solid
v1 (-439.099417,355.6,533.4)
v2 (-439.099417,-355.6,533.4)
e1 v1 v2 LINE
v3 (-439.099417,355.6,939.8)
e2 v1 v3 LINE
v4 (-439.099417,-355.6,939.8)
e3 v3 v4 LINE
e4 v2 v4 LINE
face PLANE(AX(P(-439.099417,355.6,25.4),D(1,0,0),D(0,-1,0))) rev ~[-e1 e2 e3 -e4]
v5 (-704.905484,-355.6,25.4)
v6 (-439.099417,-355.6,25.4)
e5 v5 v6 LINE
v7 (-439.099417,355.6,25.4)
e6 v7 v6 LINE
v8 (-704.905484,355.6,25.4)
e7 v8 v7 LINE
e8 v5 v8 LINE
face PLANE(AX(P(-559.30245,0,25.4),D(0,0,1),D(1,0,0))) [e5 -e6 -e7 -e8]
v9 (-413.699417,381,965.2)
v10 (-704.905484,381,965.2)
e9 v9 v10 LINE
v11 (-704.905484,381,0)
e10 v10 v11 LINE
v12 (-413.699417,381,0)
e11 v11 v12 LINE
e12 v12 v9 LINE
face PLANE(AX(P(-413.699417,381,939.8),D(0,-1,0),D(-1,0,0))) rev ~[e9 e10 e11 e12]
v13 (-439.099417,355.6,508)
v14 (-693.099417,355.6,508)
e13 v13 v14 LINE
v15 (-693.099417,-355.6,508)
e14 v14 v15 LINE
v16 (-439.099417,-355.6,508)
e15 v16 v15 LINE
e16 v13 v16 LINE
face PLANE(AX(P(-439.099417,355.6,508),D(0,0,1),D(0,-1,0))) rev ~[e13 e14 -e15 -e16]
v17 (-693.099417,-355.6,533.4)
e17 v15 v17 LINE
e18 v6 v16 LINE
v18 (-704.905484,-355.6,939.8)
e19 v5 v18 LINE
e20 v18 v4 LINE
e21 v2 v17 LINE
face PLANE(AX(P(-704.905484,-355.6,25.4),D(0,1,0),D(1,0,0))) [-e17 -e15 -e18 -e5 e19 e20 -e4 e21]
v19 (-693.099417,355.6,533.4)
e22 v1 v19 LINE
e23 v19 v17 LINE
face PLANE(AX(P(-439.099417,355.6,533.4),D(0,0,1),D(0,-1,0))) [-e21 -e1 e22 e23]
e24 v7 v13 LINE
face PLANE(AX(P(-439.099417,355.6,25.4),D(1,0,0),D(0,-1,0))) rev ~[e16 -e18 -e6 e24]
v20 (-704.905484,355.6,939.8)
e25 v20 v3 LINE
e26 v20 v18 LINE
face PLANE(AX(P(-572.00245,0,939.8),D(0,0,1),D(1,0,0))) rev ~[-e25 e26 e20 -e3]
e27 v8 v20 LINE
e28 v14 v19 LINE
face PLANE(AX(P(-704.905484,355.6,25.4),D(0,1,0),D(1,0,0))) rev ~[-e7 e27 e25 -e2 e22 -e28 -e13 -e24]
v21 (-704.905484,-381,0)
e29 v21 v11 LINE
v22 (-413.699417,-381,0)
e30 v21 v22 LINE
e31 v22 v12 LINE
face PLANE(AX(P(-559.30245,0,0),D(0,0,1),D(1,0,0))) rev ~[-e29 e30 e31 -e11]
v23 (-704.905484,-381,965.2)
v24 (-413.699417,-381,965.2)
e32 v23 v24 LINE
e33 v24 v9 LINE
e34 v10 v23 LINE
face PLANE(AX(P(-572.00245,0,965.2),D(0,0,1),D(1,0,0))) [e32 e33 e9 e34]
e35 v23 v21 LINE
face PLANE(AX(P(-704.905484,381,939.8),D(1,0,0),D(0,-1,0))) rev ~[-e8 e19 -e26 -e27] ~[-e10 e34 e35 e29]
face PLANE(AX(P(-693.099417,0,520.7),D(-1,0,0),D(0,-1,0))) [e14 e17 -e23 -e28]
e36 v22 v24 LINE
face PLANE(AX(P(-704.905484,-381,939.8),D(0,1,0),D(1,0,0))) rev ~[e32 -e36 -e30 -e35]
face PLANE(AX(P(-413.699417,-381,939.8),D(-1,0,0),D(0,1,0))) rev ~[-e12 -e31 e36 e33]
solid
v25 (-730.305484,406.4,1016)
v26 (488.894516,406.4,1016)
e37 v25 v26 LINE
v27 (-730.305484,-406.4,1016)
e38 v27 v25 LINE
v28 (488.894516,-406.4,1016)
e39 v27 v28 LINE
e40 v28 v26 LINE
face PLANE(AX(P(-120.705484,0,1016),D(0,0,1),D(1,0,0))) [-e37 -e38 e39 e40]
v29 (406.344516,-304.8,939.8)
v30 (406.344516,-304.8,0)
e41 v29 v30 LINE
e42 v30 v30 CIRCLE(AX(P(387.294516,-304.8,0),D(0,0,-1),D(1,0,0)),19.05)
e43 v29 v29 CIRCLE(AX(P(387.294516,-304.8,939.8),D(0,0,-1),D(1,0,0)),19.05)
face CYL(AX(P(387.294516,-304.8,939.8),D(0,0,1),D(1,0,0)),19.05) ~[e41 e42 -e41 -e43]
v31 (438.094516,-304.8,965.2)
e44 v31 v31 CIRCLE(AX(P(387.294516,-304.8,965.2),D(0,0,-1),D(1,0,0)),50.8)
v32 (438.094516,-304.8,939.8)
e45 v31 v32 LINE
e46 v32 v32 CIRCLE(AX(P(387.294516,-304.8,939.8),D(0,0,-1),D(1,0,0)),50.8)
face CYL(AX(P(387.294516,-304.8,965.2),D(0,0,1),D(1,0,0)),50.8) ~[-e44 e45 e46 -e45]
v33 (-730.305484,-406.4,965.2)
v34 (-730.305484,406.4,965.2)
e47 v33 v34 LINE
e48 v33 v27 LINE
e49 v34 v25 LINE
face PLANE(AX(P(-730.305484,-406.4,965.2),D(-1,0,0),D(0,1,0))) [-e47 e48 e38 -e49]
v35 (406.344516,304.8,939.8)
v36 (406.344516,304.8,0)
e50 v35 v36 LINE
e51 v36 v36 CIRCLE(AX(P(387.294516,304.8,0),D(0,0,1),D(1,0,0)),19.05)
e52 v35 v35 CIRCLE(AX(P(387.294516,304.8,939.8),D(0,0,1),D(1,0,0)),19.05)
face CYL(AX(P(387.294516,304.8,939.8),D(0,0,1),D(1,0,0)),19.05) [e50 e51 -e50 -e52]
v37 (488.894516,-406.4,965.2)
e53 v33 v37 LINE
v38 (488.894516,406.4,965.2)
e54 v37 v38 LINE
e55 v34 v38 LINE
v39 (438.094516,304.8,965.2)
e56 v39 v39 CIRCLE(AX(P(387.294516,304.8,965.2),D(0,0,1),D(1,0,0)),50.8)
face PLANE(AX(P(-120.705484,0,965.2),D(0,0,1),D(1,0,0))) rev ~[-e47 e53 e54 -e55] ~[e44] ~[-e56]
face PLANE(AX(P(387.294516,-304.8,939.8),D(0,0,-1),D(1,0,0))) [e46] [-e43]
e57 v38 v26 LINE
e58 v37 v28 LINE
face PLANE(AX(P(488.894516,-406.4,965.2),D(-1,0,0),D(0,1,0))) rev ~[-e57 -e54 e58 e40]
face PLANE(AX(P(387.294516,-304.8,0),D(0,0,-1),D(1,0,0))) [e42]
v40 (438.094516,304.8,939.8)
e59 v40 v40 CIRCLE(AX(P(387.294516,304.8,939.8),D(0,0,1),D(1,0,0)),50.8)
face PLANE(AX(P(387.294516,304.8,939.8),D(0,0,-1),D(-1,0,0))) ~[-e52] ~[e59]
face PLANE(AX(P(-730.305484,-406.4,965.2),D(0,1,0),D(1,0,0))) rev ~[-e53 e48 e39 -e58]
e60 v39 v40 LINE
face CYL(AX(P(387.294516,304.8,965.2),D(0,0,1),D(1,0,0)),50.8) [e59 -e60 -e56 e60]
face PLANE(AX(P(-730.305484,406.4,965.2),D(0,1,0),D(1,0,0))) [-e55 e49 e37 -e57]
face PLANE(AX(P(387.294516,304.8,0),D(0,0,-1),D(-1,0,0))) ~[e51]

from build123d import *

# Parameters (mm, degrees)
F0_W      = 291.2060667798
F0_H      = 762
F1_DEPTH  = 25.4
F2_W      = 265.8060667798
F2_H      = 25.4
F3_DEPTH  = 914.4
F5_W      = 265.8060667798
F5_H      = 711.2
F6_DEPTH  = 25.4
F8_W      = 1219.2
F8_H      = 812.8
F8_W_2    = 291.2060667798
F8_H_2    = 762
F9_DEPTH  = 50.8
F10_R     = 50.8
F11_DEPTH = 25.4
F12_R     = 19.05
F13_DEPTH = 939.8
F17_W     = 711.2
F17_H     = 25.4
F18_DEPTH = 254


# Not quite as in the source:
# - a feature names something its author has since deleted; it is built from what else it names


with BuildPart() as f1:
    # F0 (on Top) → F1 (new body)
    with BuildSketch(Plane.XY):
        with Locations((-559.3024502769, 0)):
            Rectangle(F0_W, F0_H)
    extrude(amount=F1_DEPTH)

    # F2 (on face) → F3 (join)
    with BuildSketch(Plane.XY.offset(25.4)):
        Polygon((-413.699416887, -381), (-413.699416887, 381), (-439.099416887, 381), (-439.099416887, 355.6), (-439.099416887, -355.6), (-439.099416887, -381), align=None)
        with Locations((-572.0024502769, 368.3)):
            Rectangle(F2_W, F2_H)
        with Locations((-572.0024502769, -368.3)):
            Rectangle(F2_W, F2_H)
    extrude(amount=F3_DEPTH)

    # F5 (on offset) → F6 (join)
    with BuildSketch(Plane.XY.offset(939.8)):
        with Locations((-572.0024502769, 0)):
            Rectangle(F5_W, F5_H)
        Polygon((-413.699416887, 381), (-704.9054836667, 381), (-704.9054836667, 355.6), (-439.099416887, 355.6), (-439.099416887, -355.6), (-704.9054836667, -355.6), (-704.9054836667, -381), (-413.699416887, -381), align=None)
    extrude(amount=F6_DEPTH)

    # F17 (on face) → F18 (join)
    with BuildSketch(Plane(origin=(-439.099416887, 0, 0), x_dir=(0, -1, 0), z_dir=(-1, 0, 0))):
        with Locations((0, 520.7)):
            Rectangle(F17_W, F17_H)
    extrude(amount=F18_DEPTH)


with BuildPart() as f9:
    # F8 (on offset) → F9 (new body)
    with BuildSketch(Plane.XY.offset(965.2)):
        with Locations((-120.7054836667, 0)):
            Rectangle(F8_W, F8_H)
        with Locations((-559.3024502769, 0)):
            Rectangle(F8_W_2, F8_H_2, mode=Mode.SUBTRACT)
        with Locations((-559.3024502769, 0)):
            Rectangle(F8_W_2, F8_H_2)
    extrude(amount=F9_DEPTH)

    # F10 (on face) → F11 (join)
    with BuildSketch(Plane(origin=(0, 0, 965.2), x_dir=(1, 0, 0), z_dir=(0, 0, -1))):
        with Locations((387.2945163333, 304.8)):
            Circle(F10_R)
    extrude(amount=F11_DEPTH)

    # F12 (on face) → F13 (join)
    with BuildSketch(Plane(origin=(0, 0, 939.8), x_dir=(1, 0, 0), z_dir=(0, 0, -1))):
        with Locations((387.2945163333, 304.8)):
            Circle(F12_R)
    extrude(amount=F13_DEPTH)

    # F16: F9 across plane


with BuildPart() as f9_1:
    add(f9.part)
    add(f9.part.mirror(Plane(origin=(0, 0, 0), x_dir=(-1, 0, 0), z_dir=(0, 1, 0))))


solid = Compound([f1.part, f9_1.part])
